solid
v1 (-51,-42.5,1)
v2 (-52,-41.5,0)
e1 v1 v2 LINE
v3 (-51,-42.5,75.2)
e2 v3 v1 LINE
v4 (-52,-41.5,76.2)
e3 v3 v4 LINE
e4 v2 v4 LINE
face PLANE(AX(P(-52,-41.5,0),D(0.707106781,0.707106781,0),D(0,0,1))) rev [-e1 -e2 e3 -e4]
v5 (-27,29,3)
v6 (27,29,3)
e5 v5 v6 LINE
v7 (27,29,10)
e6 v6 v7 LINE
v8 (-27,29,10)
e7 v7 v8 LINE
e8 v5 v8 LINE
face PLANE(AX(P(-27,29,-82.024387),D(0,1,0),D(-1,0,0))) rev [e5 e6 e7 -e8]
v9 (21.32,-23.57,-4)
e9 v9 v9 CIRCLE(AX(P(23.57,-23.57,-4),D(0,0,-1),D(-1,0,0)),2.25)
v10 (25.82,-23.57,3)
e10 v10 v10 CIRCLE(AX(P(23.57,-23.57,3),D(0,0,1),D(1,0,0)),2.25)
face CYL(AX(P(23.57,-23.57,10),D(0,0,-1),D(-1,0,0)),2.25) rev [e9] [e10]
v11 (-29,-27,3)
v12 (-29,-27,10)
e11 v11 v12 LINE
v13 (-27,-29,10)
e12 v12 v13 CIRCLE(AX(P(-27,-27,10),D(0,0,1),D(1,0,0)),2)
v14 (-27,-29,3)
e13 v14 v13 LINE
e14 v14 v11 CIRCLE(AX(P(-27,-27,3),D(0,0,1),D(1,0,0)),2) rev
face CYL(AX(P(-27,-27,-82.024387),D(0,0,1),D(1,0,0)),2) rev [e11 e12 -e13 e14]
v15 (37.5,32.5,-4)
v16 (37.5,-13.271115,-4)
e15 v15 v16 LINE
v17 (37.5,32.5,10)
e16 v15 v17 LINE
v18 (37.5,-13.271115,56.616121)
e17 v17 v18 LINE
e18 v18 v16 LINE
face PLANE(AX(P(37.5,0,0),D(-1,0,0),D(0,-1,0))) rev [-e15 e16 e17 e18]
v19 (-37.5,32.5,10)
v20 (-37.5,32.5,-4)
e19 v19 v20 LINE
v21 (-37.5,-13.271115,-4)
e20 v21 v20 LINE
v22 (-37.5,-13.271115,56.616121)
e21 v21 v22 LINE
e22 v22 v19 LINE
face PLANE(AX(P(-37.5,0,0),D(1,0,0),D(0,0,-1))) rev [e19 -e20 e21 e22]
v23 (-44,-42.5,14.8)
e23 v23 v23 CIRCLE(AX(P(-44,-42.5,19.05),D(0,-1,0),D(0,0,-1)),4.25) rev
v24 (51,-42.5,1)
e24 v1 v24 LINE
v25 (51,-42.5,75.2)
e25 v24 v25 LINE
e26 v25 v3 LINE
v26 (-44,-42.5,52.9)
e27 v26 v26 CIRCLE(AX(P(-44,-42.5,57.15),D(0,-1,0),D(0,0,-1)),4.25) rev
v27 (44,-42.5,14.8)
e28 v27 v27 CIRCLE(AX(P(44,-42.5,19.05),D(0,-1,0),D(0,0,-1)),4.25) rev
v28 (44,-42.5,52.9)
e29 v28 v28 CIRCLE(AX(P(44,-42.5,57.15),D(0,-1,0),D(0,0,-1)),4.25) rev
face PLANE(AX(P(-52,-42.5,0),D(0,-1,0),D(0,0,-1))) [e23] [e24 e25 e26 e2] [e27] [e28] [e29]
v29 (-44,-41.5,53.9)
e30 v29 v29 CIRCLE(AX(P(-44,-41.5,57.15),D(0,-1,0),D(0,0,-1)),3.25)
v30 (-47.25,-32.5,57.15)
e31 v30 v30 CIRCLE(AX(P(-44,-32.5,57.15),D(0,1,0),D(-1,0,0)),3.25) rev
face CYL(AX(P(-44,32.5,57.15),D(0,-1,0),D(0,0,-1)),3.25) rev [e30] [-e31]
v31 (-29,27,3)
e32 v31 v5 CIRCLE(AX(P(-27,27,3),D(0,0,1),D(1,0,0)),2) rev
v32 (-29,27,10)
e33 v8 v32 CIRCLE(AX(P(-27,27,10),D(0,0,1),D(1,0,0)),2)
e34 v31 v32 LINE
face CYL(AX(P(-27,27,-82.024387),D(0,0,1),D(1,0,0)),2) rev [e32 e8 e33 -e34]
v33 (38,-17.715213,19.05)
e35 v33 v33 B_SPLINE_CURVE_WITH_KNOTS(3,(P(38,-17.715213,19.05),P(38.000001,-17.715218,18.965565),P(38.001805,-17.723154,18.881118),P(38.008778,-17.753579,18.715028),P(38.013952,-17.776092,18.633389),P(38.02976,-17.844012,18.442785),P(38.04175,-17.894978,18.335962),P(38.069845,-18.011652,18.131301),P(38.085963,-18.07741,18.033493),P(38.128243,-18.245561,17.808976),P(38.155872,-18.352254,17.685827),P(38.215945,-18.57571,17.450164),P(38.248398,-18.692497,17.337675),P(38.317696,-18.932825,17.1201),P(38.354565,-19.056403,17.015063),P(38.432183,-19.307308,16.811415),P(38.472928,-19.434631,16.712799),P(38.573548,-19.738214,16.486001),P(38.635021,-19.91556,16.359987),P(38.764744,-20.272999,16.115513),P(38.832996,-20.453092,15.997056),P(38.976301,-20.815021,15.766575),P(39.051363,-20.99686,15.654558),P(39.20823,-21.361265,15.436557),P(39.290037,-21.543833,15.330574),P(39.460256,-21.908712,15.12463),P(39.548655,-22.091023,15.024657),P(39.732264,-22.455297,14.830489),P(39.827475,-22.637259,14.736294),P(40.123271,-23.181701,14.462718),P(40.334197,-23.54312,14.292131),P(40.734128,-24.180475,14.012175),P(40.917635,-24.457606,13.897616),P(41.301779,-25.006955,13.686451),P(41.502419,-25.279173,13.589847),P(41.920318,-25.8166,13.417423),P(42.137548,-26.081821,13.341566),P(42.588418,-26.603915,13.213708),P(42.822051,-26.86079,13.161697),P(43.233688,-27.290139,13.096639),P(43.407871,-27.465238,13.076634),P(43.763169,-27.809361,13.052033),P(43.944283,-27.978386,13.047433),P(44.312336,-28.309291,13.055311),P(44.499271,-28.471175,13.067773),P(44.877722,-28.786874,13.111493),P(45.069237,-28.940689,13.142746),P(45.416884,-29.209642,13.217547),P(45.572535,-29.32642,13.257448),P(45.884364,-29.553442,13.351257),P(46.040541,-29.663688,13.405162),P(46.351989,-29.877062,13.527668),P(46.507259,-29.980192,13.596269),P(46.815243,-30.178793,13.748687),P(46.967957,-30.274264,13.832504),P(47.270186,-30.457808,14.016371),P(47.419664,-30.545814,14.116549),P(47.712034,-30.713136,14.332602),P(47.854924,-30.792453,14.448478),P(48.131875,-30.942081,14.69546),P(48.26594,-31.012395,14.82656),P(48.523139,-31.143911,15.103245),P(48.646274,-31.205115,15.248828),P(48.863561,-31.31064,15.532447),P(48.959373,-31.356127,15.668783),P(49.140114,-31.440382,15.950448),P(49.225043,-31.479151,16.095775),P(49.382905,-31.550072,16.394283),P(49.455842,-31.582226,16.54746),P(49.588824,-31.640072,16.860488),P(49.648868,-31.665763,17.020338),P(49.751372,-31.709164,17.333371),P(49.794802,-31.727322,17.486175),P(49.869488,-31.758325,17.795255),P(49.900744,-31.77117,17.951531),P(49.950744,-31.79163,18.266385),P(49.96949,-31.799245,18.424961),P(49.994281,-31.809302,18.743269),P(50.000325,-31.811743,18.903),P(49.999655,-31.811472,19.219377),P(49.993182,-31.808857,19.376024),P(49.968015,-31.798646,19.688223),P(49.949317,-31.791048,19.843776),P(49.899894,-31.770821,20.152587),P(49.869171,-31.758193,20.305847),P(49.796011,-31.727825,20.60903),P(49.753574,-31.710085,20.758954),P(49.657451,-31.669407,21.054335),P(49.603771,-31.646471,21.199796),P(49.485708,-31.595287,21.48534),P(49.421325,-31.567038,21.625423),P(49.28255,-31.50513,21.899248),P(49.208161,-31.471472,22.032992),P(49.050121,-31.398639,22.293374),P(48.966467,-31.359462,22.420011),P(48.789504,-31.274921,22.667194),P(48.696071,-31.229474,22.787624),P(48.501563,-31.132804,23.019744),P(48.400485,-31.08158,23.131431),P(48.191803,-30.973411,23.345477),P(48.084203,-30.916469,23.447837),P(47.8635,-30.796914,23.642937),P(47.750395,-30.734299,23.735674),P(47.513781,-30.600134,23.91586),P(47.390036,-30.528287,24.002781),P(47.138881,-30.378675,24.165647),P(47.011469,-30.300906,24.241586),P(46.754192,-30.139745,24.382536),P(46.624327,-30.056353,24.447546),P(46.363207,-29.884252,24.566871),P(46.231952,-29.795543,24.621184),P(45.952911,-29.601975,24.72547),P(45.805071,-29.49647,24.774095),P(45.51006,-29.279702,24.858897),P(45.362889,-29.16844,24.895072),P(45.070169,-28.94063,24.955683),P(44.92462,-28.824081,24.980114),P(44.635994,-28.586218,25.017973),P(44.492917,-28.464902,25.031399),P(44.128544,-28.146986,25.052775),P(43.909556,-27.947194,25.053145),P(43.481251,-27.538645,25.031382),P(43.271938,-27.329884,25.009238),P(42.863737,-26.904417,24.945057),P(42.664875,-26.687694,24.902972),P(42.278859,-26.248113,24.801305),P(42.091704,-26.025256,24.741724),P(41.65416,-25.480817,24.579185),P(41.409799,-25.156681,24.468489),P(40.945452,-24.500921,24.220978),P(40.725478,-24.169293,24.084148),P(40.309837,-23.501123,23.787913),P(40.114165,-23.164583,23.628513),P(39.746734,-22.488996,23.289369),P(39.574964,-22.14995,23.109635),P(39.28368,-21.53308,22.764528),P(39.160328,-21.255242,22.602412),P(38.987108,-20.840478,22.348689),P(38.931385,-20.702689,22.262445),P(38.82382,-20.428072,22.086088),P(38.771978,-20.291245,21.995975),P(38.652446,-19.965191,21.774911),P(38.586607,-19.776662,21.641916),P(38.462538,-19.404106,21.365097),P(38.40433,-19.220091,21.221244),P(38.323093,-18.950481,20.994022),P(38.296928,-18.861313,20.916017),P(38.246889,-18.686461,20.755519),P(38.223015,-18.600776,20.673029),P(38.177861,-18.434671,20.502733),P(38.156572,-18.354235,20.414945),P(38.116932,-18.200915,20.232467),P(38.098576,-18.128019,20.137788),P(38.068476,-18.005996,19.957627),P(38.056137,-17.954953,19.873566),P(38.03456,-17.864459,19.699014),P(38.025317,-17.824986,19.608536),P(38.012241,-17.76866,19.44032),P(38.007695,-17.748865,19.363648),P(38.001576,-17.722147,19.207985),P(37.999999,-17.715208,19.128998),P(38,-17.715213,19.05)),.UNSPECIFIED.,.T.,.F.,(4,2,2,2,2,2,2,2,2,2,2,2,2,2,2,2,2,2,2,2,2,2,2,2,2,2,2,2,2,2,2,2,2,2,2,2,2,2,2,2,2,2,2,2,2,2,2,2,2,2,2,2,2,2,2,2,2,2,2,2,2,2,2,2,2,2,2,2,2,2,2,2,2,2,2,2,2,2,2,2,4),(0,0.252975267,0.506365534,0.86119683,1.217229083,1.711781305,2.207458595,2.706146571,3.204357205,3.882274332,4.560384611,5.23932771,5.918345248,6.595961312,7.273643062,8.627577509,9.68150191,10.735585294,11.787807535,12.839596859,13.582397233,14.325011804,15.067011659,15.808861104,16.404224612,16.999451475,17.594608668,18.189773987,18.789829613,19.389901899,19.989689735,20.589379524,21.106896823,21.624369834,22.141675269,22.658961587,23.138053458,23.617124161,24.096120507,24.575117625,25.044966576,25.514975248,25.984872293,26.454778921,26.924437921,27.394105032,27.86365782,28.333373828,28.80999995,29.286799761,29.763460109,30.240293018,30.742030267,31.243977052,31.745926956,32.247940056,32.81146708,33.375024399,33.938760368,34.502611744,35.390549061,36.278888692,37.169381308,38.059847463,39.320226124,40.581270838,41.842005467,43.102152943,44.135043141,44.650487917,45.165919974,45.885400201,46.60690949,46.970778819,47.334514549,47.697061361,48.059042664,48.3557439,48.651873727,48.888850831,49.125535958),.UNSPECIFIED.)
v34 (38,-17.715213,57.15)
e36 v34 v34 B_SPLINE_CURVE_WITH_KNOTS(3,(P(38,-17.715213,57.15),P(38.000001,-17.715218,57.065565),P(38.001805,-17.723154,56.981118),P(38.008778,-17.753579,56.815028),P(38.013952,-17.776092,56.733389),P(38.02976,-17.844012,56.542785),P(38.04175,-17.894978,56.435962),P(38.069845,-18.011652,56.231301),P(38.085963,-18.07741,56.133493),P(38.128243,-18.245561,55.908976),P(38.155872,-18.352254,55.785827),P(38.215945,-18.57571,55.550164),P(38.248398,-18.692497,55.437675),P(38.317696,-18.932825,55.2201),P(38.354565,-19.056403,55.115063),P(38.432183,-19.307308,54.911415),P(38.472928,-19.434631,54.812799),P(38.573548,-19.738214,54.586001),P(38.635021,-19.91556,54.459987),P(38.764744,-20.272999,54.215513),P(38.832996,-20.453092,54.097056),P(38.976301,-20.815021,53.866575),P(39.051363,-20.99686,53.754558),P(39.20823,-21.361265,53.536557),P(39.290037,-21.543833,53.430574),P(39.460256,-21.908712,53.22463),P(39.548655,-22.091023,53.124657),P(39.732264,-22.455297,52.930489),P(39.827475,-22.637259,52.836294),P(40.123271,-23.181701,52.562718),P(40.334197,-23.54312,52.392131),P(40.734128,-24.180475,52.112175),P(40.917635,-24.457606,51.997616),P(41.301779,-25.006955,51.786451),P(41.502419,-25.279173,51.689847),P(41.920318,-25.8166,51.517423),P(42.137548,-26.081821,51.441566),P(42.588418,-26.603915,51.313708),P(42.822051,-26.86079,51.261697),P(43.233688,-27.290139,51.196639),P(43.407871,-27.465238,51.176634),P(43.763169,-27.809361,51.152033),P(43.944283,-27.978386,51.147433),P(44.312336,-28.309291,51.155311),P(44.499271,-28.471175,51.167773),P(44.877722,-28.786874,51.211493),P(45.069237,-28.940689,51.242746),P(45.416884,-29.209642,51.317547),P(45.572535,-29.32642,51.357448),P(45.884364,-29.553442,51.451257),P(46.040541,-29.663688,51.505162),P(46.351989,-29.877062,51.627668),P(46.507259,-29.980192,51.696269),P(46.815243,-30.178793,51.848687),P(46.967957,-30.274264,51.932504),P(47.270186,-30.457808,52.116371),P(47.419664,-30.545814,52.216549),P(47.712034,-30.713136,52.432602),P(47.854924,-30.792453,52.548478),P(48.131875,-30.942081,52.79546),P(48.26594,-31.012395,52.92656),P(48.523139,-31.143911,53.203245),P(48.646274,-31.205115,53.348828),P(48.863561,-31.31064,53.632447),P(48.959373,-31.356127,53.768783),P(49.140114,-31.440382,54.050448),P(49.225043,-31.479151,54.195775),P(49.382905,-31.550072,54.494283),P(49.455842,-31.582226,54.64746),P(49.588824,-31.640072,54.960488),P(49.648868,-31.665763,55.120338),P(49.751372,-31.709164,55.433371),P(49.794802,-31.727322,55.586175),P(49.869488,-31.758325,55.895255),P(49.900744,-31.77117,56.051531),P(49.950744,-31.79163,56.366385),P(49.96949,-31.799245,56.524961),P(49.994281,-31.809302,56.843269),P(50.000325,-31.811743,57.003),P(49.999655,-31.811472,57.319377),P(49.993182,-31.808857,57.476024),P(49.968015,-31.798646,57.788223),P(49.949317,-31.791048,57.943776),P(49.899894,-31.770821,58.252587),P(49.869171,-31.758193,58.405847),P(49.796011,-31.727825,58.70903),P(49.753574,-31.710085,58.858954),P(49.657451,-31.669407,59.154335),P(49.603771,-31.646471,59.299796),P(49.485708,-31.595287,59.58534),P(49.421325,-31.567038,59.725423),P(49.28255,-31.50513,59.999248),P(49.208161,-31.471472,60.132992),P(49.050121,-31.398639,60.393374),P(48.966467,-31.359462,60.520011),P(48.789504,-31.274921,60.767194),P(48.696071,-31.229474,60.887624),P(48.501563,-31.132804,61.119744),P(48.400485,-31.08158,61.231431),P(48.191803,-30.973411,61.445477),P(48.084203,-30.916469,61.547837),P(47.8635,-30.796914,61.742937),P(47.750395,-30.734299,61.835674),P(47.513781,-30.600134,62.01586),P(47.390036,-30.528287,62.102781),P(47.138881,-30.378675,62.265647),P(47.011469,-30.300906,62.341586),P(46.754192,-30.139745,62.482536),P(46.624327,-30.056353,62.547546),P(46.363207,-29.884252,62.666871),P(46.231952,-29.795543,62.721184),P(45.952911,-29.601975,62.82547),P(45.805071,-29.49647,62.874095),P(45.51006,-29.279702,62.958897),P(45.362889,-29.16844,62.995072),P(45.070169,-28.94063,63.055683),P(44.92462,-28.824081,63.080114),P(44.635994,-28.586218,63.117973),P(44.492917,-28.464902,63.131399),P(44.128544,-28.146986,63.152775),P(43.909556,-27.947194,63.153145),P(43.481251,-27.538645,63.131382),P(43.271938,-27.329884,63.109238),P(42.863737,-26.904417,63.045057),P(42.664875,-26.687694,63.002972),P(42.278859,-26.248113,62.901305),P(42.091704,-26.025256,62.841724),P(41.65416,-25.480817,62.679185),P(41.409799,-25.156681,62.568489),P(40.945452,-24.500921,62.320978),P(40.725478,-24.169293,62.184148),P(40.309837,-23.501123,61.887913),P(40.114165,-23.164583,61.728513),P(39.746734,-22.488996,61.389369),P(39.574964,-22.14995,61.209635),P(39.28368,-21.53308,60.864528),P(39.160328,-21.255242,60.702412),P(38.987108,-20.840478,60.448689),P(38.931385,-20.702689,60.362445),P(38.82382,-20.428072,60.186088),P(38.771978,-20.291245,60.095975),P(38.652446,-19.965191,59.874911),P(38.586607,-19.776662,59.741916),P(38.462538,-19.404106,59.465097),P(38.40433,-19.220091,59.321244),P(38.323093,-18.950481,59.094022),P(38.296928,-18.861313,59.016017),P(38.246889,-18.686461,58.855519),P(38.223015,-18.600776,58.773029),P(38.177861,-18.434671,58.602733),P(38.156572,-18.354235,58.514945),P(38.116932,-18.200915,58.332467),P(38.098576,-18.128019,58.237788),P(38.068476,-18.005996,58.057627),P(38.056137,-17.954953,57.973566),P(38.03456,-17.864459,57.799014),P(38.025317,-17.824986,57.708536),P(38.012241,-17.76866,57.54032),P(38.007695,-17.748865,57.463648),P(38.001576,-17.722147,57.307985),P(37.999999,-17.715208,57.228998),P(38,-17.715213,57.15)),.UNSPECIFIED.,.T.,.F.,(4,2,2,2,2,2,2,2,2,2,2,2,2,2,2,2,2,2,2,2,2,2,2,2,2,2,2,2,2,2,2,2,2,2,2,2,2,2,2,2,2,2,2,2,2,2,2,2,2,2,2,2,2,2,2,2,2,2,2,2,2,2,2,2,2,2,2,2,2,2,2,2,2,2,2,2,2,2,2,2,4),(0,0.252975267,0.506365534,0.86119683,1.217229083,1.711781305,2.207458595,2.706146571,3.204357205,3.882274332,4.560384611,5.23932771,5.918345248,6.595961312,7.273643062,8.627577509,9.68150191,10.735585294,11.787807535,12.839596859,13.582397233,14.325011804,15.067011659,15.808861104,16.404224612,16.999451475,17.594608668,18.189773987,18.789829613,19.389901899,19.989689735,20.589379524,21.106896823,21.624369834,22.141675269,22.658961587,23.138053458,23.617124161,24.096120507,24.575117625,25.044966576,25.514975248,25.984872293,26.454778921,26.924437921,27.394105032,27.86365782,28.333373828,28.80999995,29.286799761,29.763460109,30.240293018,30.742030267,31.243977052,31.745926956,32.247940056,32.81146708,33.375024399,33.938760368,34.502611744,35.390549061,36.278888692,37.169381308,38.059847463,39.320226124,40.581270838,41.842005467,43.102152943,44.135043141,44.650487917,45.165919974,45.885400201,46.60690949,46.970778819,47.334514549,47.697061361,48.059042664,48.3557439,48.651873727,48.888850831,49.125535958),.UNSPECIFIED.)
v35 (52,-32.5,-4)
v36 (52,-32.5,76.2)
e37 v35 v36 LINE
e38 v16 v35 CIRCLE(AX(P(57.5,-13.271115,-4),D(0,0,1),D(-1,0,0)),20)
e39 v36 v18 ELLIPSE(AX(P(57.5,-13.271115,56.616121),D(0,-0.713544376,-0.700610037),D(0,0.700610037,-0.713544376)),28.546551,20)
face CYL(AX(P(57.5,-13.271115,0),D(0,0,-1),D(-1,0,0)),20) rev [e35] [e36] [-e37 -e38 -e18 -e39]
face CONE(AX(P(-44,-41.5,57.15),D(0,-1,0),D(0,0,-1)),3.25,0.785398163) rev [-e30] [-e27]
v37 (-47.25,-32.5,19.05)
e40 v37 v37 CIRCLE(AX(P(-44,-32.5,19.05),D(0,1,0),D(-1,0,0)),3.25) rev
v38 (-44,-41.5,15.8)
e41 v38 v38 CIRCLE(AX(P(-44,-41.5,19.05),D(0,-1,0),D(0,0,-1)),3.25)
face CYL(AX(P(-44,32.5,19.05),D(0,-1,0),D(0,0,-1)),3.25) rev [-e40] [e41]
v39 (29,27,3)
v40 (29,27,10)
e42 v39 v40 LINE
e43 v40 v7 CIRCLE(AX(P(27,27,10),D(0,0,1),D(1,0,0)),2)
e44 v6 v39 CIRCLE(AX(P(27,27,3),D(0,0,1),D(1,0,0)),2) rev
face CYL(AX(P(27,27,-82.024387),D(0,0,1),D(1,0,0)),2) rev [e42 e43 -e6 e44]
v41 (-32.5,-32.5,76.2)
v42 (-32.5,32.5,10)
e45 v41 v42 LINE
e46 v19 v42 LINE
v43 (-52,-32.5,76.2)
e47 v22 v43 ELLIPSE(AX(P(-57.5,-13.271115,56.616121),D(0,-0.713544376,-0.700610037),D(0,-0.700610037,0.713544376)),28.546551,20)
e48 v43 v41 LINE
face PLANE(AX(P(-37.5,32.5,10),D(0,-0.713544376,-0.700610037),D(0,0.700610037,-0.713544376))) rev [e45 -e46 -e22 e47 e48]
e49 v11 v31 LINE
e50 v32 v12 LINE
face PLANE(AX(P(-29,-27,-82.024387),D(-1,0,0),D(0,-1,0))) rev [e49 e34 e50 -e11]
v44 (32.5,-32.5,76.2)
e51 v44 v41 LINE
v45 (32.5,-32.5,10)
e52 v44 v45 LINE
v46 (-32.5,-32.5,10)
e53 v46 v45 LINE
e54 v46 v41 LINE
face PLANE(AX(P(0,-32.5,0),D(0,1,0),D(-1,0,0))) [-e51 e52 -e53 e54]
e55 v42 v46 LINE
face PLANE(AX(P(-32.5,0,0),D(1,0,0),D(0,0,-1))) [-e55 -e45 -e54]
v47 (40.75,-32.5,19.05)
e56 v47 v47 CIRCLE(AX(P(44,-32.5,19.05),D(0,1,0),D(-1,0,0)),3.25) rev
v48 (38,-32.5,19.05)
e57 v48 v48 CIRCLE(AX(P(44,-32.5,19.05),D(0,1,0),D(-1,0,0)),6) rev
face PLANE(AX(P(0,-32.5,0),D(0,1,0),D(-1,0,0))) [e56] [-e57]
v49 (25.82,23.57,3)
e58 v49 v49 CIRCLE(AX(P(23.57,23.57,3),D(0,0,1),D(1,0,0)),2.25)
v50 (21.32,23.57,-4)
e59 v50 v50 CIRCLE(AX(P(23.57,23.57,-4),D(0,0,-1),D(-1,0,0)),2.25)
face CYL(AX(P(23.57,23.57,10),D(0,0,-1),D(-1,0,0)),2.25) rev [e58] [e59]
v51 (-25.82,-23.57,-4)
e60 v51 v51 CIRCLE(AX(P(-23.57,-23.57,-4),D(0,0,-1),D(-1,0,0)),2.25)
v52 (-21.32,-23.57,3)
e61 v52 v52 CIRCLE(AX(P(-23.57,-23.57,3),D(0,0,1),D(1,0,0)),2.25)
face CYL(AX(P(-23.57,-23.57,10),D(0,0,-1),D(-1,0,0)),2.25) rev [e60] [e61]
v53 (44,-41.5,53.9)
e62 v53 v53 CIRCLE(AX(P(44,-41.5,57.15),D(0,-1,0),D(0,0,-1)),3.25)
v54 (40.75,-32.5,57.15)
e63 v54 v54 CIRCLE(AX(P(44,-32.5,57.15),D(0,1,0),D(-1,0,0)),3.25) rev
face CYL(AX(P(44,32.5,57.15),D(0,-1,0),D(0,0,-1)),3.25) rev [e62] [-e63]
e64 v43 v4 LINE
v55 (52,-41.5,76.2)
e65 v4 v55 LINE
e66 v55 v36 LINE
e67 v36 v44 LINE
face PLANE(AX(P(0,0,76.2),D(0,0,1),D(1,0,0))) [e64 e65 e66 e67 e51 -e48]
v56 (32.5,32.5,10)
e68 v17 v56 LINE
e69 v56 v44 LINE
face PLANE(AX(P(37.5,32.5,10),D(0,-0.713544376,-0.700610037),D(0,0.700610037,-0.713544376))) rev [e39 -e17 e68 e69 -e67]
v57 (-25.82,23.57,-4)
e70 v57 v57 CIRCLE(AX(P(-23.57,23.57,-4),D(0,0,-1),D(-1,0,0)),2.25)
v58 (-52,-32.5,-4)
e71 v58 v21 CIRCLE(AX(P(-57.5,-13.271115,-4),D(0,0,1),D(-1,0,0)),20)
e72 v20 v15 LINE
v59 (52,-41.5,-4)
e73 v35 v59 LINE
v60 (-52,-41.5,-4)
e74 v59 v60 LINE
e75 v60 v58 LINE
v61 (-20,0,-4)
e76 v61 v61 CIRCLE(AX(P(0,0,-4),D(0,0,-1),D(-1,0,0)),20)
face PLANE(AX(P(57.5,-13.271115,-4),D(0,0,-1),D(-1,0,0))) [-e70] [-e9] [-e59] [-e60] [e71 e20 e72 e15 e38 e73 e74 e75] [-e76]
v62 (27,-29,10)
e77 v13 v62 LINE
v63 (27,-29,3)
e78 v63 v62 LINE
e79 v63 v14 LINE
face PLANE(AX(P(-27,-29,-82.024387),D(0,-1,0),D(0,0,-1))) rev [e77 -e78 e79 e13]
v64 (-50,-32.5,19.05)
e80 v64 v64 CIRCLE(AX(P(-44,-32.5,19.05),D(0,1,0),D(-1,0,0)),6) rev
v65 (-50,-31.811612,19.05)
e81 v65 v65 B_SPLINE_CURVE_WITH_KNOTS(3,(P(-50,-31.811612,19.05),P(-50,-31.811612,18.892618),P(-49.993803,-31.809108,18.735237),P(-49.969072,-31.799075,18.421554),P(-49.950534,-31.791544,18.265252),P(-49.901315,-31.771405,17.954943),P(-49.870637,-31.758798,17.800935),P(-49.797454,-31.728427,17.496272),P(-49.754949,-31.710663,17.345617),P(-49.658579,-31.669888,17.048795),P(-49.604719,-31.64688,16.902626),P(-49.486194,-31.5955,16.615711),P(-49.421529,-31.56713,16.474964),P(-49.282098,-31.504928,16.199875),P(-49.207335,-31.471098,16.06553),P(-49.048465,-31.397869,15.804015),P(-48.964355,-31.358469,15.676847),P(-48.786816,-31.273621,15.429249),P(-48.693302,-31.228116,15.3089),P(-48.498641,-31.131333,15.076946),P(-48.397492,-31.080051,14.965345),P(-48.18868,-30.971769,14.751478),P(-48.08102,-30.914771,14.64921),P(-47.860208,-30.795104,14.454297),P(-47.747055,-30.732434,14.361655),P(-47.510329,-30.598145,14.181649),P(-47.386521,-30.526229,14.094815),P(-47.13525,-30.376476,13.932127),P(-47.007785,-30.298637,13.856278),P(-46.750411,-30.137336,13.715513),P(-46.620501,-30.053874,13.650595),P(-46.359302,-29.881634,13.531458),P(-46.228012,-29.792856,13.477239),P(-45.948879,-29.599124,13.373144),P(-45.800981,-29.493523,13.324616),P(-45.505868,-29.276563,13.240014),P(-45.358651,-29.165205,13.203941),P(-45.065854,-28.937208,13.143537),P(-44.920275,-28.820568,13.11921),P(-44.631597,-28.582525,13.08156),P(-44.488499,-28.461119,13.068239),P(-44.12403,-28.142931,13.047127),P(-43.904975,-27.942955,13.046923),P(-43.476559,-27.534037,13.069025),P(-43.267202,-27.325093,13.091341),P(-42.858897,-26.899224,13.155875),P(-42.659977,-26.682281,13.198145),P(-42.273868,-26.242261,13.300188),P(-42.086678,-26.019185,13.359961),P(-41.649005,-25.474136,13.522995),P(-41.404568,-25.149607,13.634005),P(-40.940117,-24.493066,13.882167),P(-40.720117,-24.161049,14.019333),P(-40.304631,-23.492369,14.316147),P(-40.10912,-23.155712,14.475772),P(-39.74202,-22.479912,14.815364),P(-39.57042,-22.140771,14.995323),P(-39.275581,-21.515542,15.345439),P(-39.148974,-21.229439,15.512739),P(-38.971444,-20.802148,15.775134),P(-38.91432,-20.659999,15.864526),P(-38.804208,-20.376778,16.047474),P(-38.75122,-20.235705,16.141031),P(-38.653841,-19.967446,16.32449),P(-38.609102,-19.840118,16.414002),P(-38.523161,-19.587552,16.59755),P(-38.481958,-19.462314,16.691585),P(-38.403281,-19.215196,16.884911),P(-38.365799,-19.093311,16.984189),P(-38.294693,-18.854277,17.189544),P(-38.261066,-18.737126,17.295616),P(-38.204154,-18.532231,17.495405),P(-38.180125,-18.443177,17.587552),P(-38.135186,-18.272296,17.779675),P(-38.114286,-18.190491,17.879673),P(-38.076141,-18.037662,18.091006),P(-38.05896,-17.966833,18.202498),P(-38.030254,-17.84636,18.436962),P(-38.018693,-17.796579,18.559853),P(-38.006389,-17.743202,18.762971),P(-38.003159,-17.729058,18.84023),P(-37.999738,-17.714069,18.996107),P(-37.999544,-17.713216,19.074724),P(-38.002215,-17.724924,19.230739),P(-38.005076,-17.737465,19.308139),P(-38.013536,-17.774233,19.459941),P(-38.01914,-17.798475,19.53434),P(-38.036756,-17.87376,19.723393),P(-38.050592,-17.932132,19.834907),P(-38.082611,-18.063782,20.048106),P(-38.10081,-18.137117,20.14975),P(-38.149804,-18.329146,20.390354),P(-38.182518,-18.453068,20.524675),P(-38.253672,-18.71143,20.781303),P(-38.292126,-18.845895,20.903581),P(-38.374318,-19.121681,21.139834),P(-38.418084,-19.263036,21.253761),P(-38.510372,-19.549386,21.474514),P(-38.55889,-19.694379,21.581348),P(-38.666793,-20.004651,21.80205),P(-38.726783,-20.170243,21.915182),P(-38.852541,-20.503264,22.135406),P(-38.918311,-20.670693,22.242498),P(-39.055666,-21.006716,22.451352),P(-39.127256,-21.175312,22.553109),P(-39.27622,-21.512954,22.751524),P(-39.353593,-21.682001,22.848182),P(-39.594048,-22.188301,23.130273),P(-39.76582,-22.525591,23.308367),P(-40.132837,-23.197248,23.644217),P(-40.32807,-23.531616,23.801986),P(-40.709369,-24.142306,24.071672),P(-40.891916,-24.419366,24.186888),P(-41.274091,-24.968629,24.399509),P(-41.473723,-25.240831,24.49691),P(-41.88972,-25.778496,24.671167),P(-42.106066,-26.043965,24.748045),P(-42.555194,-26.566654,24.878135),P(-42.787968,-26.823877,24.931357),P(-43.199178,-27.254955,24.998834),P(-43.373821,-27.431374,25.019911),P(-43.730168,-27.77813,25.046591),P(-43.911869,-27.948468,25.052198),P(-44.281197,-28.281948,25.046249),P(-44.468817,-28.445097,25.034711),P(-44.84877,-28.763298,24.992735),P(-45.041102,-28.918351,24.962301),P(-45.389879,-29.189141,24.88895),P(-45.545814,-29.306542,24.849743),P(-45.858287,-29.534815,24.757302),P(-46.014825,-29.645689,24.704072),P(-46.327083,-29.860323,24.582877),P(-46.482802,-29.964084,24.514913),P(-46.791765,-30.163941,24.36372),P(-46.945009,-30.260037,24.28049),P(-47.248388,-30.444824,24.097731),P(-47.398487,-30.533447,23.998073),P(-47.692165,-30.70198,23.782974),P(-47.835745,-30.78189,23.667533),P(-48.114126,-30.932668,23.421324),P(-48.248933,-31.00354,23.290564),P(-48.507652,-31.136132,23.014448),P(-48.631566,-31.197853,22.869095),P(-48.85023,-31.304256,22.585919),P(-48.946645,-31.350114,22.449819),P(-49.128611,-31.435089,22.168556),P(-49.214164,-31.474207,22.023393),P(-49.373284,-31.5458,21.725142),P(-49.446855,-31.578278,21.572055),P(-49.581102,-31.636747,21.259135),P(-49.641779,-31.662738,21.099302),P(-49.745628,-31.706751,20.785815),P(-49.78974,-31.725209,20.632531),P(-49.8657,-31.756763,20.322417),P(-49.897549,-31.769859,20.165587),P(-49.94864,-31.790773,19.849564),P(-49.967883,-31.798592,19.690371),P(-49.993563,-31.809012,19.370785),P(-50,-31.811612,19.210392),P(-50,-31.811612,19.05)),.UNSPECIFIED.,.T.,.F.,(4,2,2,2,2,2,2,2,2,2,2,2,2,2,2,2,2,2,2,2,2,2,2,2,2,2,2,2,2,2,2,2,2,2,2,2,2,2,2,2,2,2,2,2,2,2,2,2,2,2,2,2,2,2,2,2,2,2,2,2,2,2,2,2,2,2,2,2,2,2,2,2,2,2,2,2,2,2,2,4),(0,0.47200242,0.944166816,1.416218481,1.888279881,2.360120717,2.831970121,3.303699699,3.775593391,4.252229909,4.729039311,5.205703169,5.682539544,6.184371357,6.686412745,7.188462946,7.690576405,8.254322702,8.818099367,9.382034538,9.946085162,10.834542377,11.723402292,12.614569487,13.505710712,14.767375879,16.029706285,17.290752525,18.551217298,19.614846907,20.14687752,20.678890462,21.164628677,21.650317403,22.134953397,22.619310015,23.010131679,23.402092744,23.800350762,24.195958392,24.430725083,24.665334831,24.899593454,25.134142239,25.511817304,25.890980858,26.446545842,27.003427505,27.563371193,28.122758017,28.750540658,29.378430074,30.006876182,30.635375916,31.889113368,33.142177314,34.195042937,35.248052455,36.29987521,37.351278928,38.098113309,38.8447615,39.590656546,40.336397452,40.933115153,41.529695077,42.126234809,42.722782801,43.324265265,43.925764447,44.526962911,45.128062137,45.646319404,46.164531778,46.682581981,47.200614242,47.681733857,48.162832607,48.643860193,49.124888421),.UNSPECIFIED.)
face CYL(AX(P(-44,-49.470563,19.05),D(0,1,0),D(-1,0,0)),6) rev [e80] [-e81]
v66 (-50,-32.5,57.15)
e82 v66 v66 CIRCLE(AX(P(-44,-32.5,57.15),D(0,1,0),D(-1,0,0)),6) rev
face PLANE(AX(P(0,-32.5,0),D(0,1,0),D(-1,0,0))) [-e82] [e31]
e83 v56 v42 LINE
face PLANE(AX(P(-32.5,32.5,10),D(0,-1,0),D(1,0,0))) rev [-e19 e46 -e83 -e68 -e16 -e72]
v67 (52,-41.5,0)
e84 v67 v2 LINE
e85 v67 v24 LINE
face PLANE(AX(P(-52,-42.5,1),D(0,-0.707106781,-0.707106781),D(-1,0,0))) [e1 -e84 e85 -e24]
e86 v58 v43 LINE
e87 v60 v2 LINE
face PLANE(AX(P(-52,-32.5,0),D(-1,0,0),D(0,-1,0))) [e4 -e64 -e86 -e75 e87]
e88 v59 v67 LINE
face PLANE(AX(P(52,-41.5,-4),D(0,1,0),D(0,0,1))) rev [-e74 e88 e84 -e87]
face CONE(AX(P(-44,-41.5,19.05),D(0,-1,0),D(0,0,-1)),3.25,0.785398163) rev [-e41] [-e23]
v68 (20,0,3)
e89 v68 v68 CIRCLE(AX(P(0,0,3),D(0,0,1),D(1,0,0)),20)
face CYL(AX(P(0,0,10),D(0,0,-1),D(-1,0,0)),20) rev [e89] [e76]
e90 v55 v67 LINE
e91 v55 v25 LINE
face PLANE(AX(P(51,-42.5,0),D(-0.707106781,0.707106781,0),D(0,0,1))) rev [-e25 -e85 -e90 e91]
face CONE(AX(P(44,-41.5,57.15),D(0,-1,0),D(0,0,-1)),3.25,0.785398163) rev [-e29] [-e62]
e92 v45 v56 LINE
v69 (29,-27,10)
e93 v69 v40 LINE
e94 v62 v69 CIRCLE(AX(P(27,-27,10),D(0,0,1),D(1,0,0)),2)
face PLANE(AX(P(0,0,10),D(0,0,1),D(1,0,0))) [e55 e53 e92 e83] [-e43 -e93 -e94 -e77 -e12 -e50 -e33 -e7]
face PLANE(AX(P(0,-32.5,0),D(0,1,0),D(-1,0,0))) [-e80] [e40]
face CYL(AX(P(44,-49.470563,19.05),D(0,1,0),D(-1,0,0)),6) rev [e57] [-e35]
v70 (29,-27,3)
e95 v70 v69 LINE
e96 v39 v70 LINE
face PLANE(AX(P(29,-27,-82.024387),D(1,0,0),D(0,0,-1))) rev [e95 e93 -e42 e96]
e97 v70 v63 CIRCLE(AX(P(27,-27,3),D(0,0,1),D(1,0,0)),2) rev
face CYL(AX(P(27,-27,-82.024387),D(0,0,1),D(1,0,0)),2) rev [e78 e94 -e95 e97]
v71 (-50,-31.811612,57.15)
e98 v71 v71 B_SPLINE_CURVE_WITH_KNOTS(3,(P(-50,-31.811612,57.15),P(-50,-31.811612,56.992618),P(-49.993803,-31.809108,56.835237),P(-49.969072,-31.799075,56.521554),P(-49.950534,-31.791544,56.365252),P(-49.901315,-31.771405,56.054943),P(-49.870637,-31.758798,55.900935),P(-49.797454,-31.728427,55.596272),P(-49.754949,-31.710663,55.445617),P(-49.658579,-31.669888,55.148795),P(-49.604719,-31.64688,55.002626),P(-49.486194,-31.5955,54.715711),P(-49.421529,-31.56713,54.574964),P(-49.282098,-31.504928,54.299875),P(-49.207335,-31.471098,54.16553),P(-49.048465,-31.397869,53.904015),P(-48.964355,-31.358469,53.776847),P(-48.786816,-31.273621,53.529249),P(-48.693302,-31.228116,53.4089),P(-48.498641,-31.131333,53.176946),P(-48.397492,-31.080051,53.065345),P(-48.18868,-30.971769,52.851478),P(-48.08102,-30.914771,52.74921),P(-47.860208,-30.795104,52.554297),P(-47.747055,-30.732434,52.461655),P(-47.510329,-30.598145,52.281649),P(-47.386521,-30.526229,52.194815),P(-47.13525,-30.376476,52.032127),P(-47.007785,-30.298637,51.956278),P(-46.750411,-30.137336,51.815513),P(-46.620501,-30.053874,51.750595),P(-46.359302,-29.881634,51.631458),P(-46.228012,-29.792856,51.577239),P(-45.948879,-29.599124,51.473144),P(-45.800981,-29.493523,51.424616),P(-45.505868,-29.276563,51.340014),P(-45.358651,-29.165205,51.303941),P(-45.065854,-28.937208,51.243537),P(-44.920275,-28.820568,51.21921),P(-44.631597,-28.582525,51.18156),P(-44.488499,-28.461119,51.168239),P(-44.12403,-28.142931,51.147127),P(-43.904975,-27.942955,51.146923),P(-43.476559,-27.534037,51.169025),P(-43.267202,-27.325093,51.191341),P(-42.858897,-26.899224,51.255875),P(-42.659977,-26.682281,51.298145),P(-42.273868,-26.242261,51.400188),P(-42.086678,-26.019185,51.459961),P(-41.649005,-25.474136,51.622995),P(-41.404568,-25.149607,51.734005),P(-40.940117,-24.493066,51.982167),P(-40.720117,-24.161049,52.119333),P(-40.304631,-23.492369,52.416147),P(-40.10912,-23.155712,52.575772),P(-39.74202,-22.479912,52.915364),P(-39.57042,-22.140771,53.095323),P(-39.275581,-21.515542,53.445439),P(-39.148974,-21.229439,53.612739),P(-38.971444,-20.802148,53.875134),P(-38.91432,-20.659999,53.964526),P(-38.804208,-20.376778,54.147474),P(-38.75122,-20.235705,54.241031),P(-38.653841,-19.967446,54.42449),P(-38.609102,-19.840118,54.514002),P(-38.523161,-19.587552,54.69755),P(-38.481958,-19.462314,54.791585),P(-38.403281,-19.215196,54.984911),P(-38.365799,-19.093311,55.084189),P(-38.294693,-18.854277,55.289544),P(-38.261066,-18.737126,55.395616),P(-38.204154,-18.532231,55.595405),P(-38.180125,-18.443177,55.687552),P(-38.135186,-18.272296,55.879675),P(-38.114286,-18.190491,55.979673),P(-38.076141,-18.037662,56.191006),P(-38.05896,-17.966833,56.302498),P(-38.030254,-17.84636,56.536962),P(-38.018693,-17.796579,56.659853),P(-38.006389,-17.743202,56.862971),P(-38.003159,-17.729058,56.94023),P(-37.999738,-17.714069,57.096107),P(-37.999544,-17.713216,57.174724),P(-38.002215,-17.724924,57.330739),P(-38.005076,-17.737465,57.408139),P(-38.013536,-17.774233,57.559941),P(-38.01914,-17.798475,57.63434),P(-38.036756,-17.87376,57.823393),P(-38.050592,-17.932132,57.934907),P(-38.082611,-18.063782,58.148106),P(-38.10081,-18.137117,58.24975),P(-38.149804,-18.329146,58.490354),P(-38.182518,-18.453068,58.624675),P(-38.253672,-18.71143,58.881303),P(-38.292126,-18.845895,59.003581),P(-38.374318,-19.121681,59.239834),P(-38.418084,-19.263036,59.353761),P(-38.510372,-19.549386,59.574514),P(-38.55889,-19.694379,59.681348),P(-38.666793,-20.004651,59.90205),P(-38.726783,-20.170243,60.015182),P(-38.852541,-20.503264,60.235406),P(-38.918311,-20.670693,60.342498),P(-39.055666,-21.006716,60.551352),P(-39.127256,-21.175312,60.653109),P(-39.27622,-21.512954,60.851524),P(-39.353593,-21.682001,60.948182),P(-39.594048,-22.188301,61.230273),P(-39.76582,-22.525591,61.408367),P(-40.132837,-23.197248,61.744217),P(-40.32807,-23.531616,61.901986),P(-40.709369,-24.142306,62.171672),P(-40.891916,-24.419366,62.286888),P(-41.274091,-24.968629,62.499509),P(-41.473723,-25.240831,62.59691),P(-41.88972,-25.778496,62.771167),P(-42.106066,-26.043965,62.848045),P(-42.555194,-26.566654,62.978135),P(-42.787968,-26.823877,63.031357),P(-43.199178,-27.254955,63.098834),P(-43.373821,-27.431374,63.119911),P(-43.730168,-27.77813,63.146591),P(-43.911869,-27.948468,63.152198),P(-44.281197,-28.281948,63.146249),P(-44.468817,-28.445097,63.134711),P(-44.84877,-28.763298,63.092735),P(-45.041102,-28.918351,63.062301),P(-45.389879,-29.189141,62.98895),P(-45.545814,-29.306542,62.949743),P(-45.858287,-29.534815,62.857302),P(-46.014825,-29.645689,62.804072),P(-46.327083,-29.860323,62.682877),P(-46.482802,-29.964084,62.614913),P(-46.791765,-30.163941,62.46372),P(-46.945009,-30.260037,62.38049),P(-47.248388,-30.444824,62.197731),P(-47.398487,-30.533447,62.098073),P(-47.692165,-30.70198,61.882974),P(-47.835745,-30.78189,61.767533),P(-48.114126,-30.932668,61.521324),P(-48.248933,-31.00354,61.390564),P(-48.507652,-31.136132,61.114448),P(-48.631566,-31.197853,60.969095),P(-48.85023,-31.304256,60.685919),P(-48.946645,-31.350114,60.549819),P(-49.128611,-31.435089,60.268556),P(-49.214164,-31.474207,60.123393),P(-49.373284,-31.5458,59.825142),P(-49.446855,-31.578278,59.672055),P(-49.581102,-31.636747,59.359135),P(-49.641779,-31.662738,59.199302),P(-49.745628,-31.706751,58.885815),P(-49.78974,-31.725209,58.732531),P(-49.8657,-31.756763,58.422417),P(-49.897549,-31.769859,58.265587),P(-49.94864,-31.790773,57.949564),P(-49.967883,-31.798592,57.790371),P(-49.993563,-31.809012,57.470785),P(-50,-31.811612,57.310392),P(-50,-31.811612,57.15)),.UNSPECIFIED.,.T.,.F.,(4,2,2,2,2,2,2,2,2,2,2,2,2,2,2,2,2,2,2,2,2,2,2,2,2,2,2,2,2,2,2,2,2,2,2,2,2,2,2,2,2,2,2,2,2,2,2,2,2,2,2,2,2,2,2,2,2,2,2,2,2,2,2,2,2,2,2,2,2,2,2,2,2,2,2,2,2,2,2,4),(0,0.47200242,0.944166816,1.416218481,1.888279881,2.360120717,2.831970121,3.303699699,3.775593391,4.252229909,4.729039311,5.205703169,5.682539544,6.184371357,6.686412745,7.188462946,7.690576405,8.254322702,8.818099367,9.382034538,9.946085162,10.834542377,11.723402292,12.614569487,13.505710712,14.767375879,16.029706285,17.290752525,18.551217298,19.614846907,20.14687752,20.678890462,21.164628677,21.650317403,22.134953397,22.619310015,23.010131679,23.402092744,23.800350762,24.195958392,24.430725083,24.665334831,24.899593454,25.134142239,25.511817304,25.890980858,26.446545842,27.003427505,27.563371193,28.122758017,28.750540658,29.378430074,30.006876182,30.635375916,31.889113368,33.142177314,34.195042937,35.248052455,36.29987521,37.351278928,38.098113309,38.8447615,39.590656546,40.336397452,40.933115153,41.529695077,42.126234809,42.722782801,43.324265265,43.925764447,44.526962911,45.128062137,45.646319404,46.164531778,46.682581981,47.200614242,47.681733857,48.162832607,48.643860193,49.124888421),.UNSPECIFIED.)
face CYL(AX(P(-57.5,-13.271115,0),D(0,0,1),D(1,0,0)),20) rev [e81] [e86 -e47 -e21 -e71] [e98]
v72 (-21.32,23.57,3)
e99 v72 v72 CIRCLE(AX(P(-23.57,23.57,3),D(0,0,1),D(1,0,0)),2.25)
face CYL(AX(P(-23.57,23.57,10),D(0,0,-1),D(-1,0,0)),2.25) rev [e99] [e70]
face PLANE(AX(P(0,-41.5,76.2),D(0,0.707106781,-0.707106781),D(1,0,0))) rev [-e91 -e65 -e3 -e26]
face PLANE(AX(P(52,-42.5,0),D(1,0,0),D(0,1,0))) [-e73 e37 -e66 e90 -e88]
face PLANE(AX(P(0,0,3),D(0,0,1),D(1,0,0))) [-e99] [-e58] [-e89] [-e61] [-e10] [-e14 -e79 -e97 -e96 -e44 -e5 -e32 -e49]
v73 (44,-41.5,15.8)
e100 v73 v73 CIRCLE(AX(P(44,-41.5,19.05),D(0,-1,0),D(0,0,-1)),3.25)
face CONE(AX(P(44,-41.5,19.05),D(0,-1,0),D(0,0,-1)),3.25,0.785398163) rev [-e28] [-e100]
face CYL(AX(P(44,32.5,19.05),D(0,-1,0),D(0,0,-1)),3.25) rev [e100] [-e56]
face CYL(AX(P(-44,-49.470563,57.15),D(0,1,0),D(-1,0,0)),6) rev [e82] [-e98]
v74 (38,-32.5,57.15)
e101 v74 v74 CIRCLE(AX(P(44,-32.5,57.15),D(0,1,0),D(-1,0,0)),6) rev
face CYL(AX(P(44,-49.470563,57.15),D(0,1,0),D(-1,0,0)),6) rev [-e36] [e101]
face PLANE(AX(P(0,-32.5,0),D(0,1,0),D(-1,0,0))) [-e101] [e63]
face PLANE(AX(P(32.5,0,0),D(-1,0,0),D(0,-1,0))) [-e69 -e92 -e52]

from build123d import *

# Parameters (mm, degrees)
SKETCH1_W                = 65
SKETCH1_H                = 65
SKETCH1_R                = 20
SKETCH1_R_2              = 2.25
BOSS_EXTRUDE1_DEPTH      = 10
BOSS_EXTRUDE2_DEPTH      = 66.2
BOSS_EXTRUDE2_DEPTH_BACK = 10
BOSS_EXTRUDE3_DEPTH      = 5
BOSS_EXTRUDE4_DEPTH      = 5
FILLET1_R                = 20
SKETCH3_R                = 3.25
CUT_EXTRUDE1_DEPTH       = 119.892556537
CUT_EXTRUDE2_START       = -21
SKETCH6_R                = 6
SKETCH6_R_2              = 3.25
CUT_EXTRUDE2_DEPTH       = 21
CHAMFER1_SIZE            = 1
CUT_EXTRUDE3_DEPTH       = 7
BOSS_EXTRUDE5_START      = 4
SKETCH8_R                = 20
SKETCH8_R_2              = 2.25
BOSS_EXTRUDE5_DEPTH      = 4


with BuildPart() as part:
    # Sketch1 → Boss-Extrude1 (new body)
    with BuildSketch(Plane.XY):
        Rectangle(SKETCH1_W, SKETCH1_H)
        Circle(SKETCH1_R, mode=Mode.SUBTRACT)
        with Locations((23.57, 23.57)):
            Circle(SKETCH1_R_2, mode=Mode.SUBTRACT)
        with Locations((-23.57, 23.57)):
            Circle(SKETCH1_R_2, mode=Mode.SUBTRACT)
        with Locations((-23.57, -23.57)):
            Circle(SKETCH1_R_2, mode=Mode.SUBTRACT)
        with Locations((23.57, -23.57)):
            Circle(SKETCH1_R_2, mode=Mode.SUBTRACT)
    extrude(amount=BOSS_EXTRUDE1_DEPTH)

    # Sketch2 → Boss-Extrude2 (add, two sides: drawn at the far end of the back side and taken through both)
    with BuildSketch(Plane.XY.offset(10).offset(-BOSS_EXTRUDE2_DEPTH_BACK)):
        Polygon((0, -32.5), (-52, -32.5), (-52, -42.5), (52, -42.5), (52, -32.5), align=None)
    extrude(amount=BOSS_EXTRUDE2_DEPTH + BOSS_EXTRUDE2_DEPTH_BACK)

    # Sketch4 → Boss-Extrude3 (add)
    with BuildSketch(Plane(origin=(32.5, 0, 0), x_dir=(0, 0, -1), z_dir=(1, 0, 0))):
        Polygon((0, -32.5), (-76.2, -32.5), (-10, 32.5), (0, 32.5), align=None)
    extrude(amount=BOSS_EXTRUDE3_DEPTH)

    # Sketch5 → Boss-Extrude4 (add)
    with BuildSketch(Plane.ZY.offset(32.5)):
        Polygon((10, 32.5), (0, 32.5), (0, -32.5), (76.2, -32.5), align=None)
    extrude(amount=BOSS_EXTRUDE4_DEPTH)

    # Fillet1
    # the kernel refuses this fillet: 20 mm, written as the material it adds along each edge
    with BuildSketch(Plane(origin=(37.5, -32.5, 0), x_dir=(0, 1, 0), z_dir=(0, 0, 1))) as fillet1_piece_1_section:
        with BuildLine():
            CenterArc((19.228884523, -20), FILLET1_R, 90, 74.037985837)
            Line((0, -14.5), (-0.38457769, -14.39))
            ThreePointArc((-0.38457769, -14.39), (-0.4, -7.25), (-0.4, 0))
            Line((-0.4, 0), (0, 0.4))
            Line((0, 0.4), (19.228884523, 0.4))
            Line((19.228884523, 0.4), (19.228884523, 0))
        make_face()
    fillet1_piece_1 = extrude(amount=76.2, mode=Mode.PRIVATE)
    fillet1_piece_1 = split(fillet1_piece_1, bisect_by=Plane(origin=(41.304547975, -10.240766457, 53.529826761), z_dir=(0, -0.7135443759045971, -0.7006100367643324)), keep=Keep.TOP, mode=Mode.PRIVATE)
    add(fillet1_piece_1)
    with BuildSketch(Plane(origin=(-37.5, -32.5, 0), x_dir=(-1, 0, 0), z_dir=(0, 0, 1))) as fillet1_piece_2_section:
        with BuildLine():
            CenterArc((20, -19.228884523), FILLET1_R, 105.962014163, 74.037985837)
            Line((0, -19.228884523), (-0.4, -19.228884523))
            Line((-0.4, -19.228884523), (-0.4, 0))
            Line((-0.4, 0), (0, 0.4))
            ThreePointArc((0, 0.4), (7.25, 0.4), (14.39, 0.38457769))
            Line((14.39, 0.38457769), (14.5, 0))
        make_face()
    fillet1_piece_2 = extrude(amount=76.2, mode=Mode.PRIVATE)
    fillet1_piece_2 = split(fillet1_piece_2, bisect_by=Plane(origin=(-41.304547975, -10.240766457, 53.529826761), z_dir=(0, -0.7135443759045971, -0.7006100367643324)), keep=Keep.TOP, mode=Mode.PRIVATE)
    add(fillet1_piece_2)

    # Sketch3 → Cut-Extrude1 (cut, through all)
    with BuildSketch(Plane.XZ.offset(42.5)):
        with Locations(Location((44, 19.05, 0), (0, 0, 270))):
            Circle(SKETCH3_R)
        with Locations(Location((-44, 19.05, 0), (0, 0, 270))):
            Circle(SKETCH3_R)
        with Locations(Location((-44, 57.15, 0), (0, 0, 270))):
            Circle(SKETCH3_R)
        with Locations(Location((44, 57.15, 0), (0, 0, 270))):
            Circle(SKETCH3_R)
    extrude(amount=-CUT_EXTRUDE1_DEPTH, mode=Mode.SUBTRACT)

    # Sketch6 → Cut-Extrude2 (cut)
    # profile 1 of 4: a face of its own
    with BuildSketch(Plane(origin=(0, -11.5, 0), x_dir=(1, 0, 0), z_dir=(0, 1, 0)).offset(CUT_EXTRUDE2_START)):
        with Locations(Location((-44, -19.05, 0), (0, 0, 180))):
            Circle(SKETCH6_R)
        with Locations(Location((-44, -19.05, 0), (0, 0, 90))):
            Circle(SKETCH6_R_2, mode=Mode.SUBTRACT)
    # profile 2 of 4: a face of its own
    with BuildSketch(Plane(origin=(0, -11.5, 0), x_dir=(1, 0, 0), z_dir=(0, 1, 0)).offset(CUT_EXTRUDE2_START)):
        with Locations(Location((-44, -57.15, 0), (0, 0, 180))):
            Circle(SKETCH6_R)
        with Locations(Location((-44, -57.15, 0), (0, 0, 90))):
            Circle(SKETCH6_R_2, mode=Mode.SUBTRACT)
    # profile 3 of 4: a face of its own
    with BuildSketch(Plane(origin=(0, -11.5, 0), x_dir=(1, 0, 0), z_dir=(0, 1, 0)).offset(CUT_EXTRUDE2_START)):
        with Locations(Location((44, -57.15, 0), (0, 0, 180))):
            Circle(SKETCH6_R)
        with Locations(Location((44, -57.15, 0), (0, 0, 90))):
            Circle(SKETCH6_R_2, mode=Mode.SUBTRACT)
    # profile 4 of 4: a face of its own
    with BuildSketch(Plane(origin=(0, -11.5, 0), x_dir=(1, 0, 0), z_dir=(0, 1, 0)).offset(CUT_EXTRUDE2_START)):
        with Locations(Location((44, -19.05, 0), (0, 0, 180))):
            Circle(SKETCH6_R)
        with Locations(Location((44, -19.05, 0), (0, 0, 90))):
            Circle(SKETCH6_R_2, mode=Mode.SUBTRACT)
    extrude(amount=CUT_EXTRUDE2_DEPTH, mode=Mode.SUBTRACT)

    # Chamfer1
    chamfer1_edges = [part.edges().sort_by_distance(p)[0] for p in [
        (-44, -42.5, 60.4),
        (-44, -42.5, 22.3),
        (44, -42.5, 22.3),
        (52, -42.5, 38.1),
        (0, -42.5, 0),
        (-52, -42.5, 38.1),
        (0, -42.5, 76.2),
        (44, -42.5, 60.4),
    ]]
    chamfer(chamfer1_edges, length=CHAMFER1_SIZE)

    # Sketch7 → Cut-Extrude3 (cut)
    with BuildSketch(Plane.XY.offset(10)):
        with BuildLine():
            Line((-27, -29), (27, -29))
            ThreePointArc((27, -29), (28.414213562, -28.414213562), (29, -27))
            Line((29, -27), (29, 27))
            ThreePointArc((29, 27), (28.414213562, 28.414213562), (27, 29))
            Line((27, 29), (-27, 29))
            ThreePointArc((-27, 29), (-28.414213562, 28.414213562), (-29, 27))
            Line((-29, 27), (-29, -27))
            ThreePointArc((-29, -27), (-28.414213562, -28.414213562), (-27, -29))
        make_face()
    extrude(amount=-CUT_EXTRUDE3_DEPTH, mode=Mode.SUBTRACT)

    # Sketch8 → Boss-Extrude5 (add)
    with BuildSketch(Plane(origin=(0, 0, 0), x_dir=(-1, 0, 0), z_dir=(0, 0, -1)).offset(BOSS_EXTRUDE5_START)):
        with BuildLine():
            Line((-52, -32.5), (-52, -41.5))
            Line((-52, -41.5), (52, -41.5))
            Line((52, -41.5), (52, -32.5))
            ThreePointArc((52, -32.5), (41.531280577, -25.312710056), (37.5, -13.271115477))
            Line((37.5, -13.271115477), (37.5, 32.5))
            Line((37.5, 32.5), (-37.5, 32.5))
            Line((-37.5, 32.5), (-37.5, -13.271115477))
            ThreePointArc((-37.5, -13.271115477), (-41.531280577, -25.312710056), (-52, -32.5))
        make_face()
        Circle(SKETCH8_R, mode=Mode.SUBTRACT)
        with Locations((-23.57, -23.57)):
            Circle(SKETCH8_R_2, mode=Mode.SUBTRACT)
        with Locations((-23.57, 23.57)):
            Circle(SKETCH8_R_2, mode=Mode.SUBTRACT)
        with Locations((23.57, -23.57)):
            Circle(SKETCH8_R_2, mode=Mode.SUBTRACT)
        with Locations((23.57, 23.57)):
            Circle(SKETCH8_R_2, mode=Mode.SUBTRACT)
    extrude(amount=-BOSS_EXTRUDE5_DEPTH)


solid = part.part
